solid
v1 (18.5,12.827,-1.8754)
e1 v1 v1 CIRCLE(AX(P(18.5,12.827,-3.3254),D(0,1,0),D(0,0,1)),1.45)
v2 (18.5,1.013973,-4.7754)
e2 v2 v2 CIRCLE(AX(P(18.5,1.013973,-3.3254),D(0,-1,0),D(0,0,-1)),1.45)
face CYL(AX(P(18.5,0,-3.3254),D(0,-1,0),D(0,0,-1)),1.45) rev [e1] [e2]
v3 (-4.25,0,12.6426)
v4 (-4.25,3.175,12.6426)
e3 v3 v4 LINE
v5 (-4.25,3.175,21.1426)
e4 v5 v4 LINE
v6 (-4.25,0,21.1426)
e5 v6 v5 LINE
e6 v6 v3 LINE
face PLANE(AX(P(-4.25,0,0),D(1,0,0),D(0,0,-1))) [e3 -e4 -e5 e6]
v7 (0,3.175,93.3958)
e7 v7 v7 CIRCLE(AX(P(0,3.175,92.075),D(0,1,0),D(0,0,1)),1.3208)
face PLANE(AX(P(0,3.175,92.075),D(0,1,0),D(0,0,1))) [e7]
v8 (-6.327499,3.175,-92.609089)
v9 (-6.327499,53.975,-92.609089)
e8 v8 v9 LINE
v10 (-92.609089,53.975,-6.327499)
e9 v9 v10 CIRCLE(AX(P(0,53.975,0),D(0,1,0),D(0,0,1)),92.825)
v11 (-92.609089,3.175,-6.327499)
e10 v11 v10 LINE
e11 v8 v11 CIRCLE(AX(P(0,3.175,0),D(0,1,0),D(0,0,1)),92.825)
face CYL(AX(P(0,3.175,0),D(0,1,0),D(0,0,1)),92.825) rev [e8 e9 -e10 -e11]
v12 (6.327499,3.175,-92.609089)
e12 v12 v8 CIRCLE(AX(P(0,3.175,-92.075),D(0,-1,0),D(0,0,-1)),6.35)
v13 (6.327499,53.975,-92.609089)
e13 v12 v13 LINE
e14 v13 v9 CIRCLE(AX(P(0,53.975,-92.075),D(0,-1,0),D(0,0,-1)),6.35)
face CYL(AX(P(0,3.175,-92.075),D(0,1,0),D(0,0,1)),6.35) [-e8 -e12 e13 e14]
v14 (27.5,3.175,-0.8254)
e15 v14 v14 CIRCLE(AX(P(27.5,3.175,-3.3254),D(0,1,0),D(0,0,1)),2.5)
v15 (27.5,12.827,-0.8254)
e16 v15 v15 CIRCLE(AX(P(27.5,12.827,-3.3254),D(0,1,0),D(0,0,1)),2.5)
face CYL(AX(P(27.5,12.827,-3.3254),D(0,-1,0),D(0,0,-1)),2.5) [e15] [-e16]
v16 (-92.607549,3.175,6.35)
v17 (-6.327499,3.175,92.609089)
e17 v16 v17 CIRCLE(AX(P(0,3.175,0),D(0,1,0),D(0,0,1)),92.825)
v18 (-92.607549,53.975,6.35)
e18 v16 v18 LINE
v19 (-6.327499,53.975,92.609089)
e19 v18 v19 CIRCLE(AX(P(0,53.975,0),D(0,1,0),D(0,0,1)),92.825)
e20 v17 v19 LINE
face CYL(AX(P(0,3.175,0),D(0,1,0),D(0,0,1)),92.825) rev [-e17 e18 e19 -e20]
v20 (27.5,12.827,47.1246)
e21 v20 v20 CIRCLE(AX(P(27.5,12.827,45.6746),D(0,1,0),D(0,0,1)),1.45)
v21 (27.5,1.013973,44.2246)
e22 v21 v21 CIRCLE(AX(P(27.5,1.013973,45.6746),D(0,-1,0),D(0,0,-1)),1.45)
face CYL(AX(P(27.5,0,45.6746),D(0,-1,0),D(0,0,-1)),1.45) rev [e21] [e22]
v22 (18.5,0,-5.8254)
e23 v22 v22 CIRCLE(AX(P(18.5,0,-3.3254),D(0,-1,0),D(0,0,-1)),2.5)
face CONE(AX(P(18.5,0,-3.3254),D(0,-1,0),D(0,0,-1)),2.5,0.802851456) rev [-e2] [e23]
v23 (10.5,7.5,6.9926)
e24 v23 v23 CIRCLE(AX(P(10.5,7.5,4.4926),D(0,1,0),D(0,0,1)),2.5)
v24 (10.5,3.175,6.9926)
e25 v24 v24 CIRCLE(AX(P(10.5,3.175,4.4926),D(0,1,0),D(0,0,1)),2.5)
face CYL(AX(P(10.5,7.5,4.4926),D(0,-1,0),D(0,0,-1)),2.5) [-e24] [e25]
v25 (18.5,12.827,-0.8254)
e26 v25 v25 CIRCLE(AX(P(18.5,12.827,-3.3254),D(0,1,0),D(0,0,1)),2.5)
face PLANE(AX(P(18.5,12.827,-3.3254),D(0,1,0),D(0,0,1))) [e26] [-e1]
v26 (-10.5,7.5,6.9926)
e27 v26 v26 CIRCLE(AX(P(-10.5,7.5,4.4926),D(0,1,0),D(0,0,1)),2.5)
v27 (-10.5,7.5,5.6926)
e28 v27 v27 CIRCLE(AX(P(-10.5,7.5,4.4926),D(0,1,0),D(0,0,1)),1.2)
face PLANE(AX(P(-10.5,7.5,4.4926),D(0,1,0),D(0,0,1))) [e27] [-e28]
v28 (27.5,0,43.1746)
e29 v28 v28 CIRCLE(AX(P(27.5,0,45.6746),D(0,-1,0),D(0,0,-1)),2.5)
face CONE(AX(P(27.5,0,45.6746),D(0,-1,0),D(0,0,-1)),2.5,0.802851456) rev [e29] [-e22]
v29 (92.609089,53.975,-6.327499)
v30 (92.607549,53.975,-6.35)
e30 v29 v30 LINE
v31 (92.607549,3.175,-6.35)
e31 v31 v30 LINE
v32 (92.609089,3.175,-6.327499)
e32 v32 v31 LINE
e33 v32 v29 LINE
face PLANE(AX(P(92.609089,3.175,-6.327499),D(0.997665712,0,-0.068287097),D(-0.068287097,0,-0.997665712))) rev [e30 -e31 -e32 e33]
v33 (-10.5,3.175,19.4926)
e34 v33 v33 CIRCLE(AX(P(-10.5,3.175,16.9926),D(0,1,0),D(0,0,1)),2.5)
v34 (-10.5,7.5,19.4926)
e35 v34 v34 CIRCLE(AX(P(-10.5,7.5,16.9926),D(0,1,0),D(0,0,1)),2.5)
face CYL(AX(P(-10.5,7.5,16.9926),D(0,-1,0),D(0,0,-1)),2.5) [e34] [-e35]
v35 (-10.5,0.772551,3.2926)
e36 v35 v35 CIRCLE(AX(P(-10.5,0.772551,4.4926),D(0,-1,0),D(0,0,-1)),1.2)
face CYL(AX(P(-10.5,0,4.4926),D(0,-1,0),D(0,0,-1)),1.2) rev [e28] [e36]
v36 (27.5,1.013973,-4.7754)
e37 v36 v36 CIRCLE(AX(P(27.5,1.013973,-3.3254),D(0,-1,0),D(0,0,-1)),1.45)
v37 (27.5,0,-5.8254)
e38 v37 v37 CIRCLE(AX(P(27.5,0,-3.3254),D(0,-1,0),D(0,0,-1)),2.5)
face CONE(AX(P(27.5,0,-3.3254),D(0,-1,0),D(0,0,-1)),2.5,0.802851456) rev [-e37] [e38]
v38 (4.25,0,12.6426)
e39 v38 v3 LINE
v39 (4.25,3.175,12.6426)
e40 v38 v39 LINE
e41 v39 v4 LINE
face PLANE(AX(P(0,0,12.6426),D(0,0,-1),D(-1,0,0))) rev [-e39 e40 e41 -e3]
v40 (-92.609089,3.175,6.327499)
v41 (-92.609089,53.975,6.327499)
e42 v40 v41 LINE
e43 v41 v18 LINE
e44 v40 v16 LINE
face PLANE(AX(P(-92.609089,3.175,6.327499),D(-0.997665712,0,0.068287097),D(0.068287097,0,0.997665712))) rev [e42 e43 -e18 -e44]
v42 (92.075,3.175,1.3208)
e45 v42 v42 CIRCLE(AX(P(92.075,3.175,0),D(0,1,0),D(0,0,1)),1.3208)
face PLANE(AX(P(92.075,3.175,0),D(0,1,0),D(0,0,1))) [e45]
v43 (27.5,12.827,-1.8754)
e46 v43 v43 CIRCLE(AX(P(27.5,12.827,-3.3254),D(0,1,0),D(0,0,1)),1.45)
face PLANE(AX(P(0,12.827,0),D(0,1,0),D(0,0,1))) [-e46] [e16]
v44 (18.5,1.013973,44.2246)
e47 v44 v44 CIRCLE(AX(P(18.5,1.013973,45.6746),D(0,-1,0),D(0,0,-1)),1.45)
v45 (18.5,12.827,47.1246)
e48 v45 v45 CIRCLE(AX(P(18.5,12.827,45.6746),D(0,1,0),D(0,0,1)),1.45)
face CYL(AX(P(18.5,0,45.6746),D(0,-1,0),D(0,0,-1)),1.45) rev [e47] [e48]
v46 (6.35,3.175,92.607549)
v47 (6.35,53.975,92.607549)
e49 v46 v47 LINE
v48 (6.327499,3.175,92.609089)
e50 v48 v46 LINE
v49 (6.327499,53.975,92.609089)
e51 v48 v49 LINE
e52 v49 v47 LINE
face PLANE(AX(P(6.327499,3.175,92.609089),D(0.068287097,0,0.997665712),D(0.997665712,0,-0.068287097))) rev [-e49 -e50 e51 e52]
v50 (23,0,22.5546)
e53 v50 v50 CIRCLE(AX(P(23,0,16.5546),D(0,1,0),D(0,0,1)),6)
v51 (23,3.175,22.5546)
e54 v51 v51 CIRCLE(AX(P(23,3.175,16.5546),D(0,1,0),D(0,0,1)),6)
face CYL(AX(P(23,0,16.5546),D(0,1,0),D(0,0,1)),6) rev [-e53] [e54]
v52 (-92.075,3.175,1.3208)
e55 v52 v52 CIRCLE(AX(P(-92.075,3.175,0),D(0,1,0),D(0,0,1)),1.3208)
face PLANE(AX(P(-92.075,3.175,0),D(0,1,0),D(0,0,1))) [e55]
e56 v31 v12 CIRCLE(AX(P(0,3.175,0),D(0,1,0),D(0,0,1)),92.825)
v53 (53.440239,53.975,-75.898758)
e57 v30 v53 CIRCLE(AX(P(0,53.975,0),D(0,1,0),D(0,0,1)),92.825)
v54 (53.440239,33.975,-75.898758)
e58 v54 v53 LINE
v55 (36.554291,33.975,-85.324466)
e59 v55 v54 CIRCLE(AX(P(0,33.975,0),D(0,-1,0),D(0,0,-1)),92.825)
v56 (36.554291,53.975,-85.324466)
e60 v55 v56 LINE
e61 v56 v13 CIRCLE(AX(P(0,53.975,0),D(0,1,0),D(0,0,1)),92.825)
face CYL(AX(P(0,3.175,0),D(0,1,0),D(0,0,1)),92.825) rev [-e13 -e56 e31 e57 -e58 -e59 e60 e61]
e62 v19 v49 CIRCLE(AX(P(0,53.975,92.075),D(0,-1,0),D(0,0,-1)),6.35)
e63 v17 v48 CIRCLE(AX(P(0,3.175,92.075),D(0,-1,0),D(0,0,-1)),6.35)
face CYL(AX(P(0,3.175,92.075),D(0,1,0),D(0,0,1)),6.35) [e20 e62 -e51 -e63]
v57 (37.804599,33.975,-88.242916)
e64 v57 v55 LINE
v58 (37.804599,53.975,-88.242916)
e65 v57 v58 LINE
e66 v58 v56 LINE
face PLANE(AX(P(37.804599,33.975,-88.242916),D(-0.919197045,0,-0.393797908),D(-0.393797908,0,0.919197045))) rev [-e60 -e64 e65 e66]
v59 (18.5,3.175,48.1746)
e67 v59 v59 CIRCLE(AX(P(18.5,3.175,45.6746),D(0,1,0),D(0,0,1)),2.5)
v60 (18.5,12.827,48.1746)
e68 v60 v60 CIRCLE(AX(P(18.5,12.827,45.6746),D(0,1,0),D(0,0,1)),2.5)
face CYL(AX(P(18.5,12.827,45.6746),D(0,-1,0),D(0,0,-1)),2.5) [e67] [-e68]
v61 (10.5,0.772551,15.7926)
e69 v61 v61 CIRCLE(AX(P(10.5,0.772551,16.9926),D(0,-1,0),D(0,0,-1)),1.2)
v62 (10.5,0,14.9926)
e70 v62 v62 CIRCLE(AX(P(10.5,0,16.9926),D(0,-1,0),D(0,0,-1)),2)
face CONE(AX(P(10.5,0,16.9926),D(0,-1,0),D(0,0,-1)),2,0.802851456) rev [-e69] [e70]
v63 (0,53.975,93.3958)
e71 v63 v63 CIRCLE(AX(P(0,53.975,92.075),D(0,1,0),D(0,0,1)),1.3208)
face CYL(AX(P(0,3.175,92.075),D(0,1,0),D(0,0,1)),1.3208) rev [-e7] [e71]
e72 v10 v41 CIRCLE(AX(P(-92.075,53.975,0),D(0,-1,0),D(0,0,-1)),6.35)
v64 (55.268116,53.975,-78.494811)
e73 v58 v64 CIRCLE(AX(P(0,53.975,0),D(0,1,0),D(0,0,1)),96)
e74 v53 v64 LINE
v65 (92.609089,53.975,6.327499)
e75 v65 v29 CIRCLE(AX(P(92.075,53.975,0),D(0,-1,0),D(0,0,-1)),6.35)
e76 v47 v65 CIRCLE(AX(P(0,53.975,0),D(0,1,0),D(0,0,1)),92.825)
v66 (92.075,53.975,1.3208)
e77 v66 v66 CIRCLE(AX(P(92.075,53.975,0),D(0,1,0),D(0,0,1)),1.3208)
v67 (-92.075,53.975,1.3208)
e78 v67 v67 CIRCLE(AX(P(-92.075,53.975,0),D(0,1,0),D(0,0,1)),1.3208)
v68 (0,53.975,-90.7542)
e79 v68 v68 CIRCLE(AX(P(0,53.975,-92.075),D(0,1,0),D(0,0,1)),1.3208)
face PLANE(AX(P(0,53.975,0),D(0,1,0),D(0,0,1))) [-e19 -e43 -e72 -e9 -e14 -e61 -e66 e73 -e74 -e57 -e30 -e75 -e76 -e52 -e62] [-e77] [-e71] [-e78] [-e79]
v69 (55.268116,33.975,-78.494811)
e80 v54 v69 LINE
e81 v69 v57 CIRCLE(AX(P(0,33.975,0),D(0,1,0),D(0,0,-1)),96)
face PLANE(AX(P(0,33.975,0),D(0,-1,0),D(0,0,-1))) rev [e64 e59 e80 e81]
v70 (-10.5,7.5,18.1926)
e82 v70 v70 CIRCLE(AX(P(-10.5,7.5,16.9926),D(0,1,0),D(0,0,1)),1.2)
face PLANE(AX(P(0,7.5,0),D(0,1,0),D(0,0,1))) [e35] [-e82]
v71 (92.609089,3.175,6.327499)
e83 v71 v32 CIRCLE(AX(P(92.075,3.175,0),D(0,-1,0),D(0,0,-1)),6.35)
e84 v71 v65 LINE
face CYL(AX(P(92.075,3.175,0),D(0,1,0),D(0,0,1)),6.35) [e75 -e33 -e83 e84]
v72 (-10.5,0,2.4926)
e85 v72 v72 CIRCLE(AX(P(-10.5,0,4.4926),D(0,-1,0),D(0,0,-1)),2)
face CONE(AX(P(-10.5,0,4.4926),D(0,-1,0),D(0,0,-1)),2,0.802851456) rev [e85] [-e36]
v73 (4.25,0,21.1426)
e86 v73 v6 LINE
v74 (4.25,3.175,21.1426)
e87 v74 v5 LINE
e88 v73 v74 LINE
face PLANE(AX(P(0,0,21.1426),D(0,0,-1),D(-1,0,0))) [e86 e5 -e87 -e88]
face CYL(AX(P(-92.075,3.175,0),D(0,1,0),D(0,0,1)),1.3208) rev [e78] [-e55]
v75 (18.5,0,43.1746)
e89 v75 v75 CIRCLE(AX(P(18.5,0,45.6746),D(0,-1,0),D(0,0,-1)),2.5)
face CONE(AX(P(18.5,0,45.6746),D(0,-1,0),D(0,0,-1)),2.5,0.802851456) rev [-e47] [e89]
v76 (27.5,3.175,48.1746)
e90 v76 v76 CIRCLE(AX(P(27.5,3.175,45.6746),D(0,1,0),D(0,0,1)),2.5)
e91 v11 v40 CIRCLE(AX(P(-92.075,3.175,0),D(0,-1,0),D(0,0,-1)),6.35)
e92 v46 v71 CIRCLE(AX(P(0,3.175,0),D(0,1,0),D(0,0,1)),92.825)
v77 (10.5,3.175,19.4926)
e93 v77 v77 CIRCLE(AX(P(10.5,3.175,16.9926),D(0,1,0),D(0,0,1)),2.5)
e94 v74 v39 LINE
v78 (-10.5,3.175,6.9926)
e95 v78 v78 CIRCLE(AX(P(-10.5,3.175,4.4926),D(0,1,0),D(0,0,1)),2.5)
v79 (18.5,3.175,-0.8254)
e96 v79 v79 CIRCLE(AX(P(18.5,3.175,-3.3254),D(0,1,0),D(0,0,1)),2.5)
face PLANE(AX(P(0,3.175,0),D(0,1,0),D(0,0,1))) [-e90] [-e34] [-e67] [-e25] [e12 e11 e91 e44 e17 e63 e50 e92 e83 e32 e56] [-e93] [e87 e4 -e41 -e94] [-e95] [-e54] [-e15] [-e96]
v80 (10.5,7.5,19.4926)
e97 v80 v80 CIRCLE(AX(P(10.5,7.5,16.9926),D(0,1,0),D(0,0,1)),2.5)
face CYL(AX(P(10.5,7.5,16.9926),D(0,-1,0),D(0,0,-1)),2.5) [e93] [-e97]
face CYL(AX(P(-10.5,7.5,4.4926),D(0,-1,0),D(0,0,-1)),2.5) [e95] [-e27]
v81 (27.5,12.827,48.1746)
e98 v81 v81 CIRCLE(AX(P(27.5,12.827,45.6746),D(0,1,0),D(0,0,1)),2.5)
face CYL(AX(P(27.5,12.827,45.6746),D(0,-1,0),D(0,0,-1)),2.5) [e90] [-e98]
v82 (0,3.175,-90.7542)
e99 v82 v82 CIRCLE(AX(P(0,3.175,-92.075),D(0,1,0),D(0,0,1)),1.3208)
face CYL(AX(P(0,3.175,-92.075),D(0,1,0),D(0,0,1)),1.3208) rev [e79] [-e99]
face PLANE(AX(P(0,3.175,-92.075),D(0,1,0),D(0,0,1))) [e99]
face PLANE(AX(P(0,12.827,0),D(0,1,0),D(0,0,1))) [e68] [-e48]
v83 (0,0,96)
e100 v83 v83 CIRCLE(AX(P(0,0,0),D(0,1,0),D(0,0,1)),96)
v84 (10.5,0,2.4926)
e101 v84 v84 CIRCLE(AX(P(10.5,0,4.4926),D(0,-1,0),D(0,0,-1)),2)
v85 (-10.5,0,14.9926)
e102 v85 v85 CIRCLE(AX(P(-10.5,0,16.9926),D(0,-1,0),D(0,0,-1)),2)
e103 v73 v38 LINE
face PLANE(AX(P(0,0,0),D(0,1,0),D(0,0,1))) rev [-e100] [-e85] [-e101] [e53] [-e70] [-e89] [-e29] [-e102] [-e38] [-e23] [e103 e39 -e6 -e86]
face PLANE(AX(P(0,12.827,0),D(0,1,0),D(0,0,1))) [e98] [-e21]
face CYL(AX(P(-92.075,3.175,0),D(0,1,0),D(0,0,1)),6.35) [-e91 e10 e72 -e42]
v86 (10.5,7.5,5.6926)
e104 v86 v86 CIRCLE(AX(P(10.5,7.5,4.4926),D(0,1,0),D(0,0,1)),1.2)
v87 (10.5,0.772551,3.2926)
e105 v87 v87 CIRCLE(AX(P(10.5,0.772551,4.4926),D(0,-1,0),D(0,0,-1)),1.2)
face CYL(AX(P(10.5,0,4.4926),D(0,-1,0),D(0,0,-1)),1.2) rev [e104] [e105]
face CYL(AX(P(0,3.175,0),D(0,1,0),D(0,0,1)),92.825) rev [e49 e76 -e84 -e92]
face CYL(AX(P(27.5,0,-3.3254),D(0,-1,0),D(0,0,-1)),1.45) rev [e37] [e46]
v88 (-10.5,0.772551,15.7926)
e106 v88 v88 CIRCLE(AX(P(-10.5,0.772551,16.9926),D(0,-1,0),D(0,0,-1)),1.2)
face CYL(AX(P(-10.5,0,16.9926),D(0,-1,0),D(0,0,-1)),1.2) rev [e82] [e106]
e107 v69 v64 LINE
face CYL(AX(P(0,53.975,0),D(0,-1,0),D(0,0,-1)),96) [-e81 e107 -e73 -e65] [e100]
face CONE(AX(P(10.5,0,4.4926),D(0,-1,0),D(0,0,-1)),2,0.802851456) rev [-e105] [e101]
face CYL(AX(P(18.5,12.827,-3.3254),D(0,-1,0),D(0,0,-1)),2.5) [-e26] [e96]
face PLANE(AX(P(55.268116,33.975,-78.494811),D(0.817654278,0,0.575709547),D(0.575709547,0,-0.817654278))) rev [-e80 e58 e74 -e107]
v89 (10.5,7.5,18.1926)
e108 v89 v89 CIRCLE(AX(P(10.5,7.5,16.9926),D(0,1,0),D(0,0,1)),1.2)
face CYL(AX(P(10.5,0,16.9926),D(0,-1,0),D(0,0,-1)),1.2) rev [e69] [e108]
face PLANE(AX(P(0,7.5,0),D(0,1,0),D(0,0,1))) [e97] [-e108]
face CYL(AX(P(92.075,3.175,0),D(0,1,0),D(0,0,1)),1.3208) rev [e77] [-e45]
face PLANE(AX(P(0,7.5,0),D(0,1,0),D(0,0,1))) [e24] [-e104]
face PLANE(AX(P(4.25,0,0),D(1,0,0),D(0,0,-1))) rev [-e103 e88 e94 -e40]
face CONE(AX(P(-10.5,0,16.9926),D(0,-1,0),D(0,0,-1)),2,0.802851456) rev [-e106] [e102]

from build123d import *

# Parameters (mm, degrees)
SKETCH1_R                                            = 96
BOSS_EXTRUDE1_DEPTH                                  = 53.975
SKETCH2_R                                            = 1.3208
CUT_EXTRUDE1_DEPTH                                   = 50.8
SKETCH3_R                                            = 6
SKETCH3_W                                            = 8.5
SKETCH3_H                                            = 8.5
CUT_EXTRUDE2_DEPTH                                   = 145.957373045
BOSS_EXTRUDE2_START                                  = 3.175
BOSS_EXTRUDE2_OUTLINE_R                              = 2.5
BOSS_EXTRUDE2_DEPTH                                  = 4.325
BOSS_EXTRUDE3_START                                  = 3.175
BOSS_EXTRUDE3_OUTLINE_R                              = 2.5
BOSS_EXTRUDE3_DEPTH                                  = 9.652
CSK_FOR_M2_5_CROSS_COUNTERSUNK_HEAD_SCRE_D           = 2.9
CSK_FOR_M2_5_CROSS_COUNTERSUNK_HEAD_SCRE_CSINK_D     = 5
CSK_FOR_M2_5_CROSS_COUNTERSUNK_HEAD_SCRE_CSINK_ANGLE = 92
CSK_FOR_M2_CROSS_COUNTERSUNK_HEAD_SCREW1_D           = 2.4
CSK_FOR_M2_CROSS_COUNTERSUNK_HEAD_SCREW1_CSINK_D     = 4
CSK_FOR_M2_CROSS_COUNTERSUNK_HEAD_SCREW1_CSINK_ANGLE = 92
CUT_EXTRUDE4_DEPTH                                   = 20


# Read off the part's stored shape, not the designer's step: Boss-Extrude2, Boss-Extrude3
with BuildPart() as part:
    # Sketch1 → Boss-Extrude1 (new body)
    with BuildSketch(Plane(origin=(0, 0, 0), x_dir=(1, 0, 0), z_dir=(0, 1, 0))):
        with Locations(Location((0, 0, 0), (0, 0, 270))):
            Circle(SKETCH1_R)
    extrude(amount=BOSS_EXTRUDE1_DEPTH)

    # Sketch2 → Cut-Extrude1 (cut)
    with BuildSketch(Plane(origin=(0, 53.975, 0), x_dir=(1, 0, 0), z_dir=(0, 1, 0))):
        with Locations(Location((0, 92.075, 0), (0, 0, 270))):
            Circle(SKETCH2_R)
        with Locations(Location((92.075, 0, 0), (0, 0, 270))):
            Circle(SKETCH2_R)
        with Locations(Location((0, -92.075, 0), (0, 0, 270))):
            Circle(SKETCH2_R)
        with Locations(Location((-92.075, 0, 0), (0, 0, 270))):
            Circle(SKETCH2_R)
        with BuildLine():
            Line((92.609089058, 6.327499417), (92.607548963, 6.35))
            ThreePointArc((92.607548963, 6.35), (65.629212709, 65.64516025), (6.327499417, 92.609089058))
            ThreePointArc((6.327499417, 92.609089058), (0, 85.725), (-6.327499417, 92.609089058))
            ThreePointArc((-6.327499417, 92.609089058), (-65.637186964, 65.637186964), (-92.609089058, 6.327499417))
            ThreePointArc((-92.609089058, 6.327499417), (-85.725, 0), (-92.609089058, -6.327499417))
            Line((-92.609089058, -6.327499417), (-92.607548963, -6.35))
            ThreePointArc((-92.607548963, -6.35), (-65.629212709, -65.64516025), (-6.327499417, -92.609089058))
            ThreePointArc((-6.327499417, -92.609089058), (0, -85.725), (6.327499417, -92.609089058))
            Line((6.327499417, -92.609089058), (6.35, -92.607548963))
            ThreePointArc((6.35, -92.607548963), (65.64516025, -65.629212709), (92.609089058, -6.327499417))
            ThreePointArc((92.609089058, -6.327499417), (85.725, 0), (92.609089058, 6.327499417))
        make_face()
    extrude(amount=-CUT_EXTRUDE1_DEPTH, mode=Mode.SUBTRACT)

    # Sketch3 → Cut-Extrude2 (cut, through all)
    with BuildSketch(Plane(origin=(0, 3.175, 0), x_dir=(1, 0, 0), z_dir=(0, 1, 0))):
        with Locations(Location((23, -16.5546, 0), (0, 0, 270))):
            Circle(SKETCH3_R)
        with Locations((0, -16.8926)):
            Rectangle(SKETCH3_W, SKETCH3_H)
    extrude(amount=-CUT_EXTRUDE2_DEPTH, mode=Mode.SUBTRACT)

    # Boss-Extrude2 outline → Boss-Extrude2 (add)
    with BuildSketch(Plane(origin=(0, 0, 0), x_dir=(1, 0, 0), z_dir=(0, 1, 0)).offset(BOSS_EXTRUDE2_START)):
        with Locations((10.5, -4.4926)):
            Circle(BOSS_EXTRUDE2_OUTLINE_R)
        with Locations((10.5, -16.9926)):
            Circle(BOSS_EXTRUDE2_OUTLINE_R)
        with Locations((-10.5, -16.9926)):
            Circle(BOSS_EXTRUDE2_OUTLINE_R)
        with Locations((-10.5, -4.4926)):
            Circle(BOSS_EXTRUDE2_OUTLINE_R)
    extrude(amount=BOSS_EXTRUDE2_DEPTH)

    # Boss-Extrude3 outline → Boss-Extrude3 (add)
    with BuildSketch(Plane(origin=(0, 0, 0), x_dir=(1, 0, 0), z_dir=(0, 1, 0)).offset(BOSS_EXTRUDE3_START)):
        with Locations((27.5, 3.3254)):
            Circle(BOSS_EXTRUDE3_OUTLINE_R)
        with Locations((18.5, -45.6746)):
            Circle(BOSS_EXTRUDE3_OUTLINE_R)
        with Locations((27.5, -45.6746)):
            Circle(BOSS_EXTRUDE3_OUTLINE_R)
        with Locations((18.5, 3.3254)):
            Circle(BOSS_EXTRUDE3_OUTLINE_R)
    extrude(amount=BOSS_EXTRUDE3_DEPTH)

    # CSK for M2.5 Cross Countersunk Head Screw1 (through all)
    with Locations(Plane(origin=(0, 0, 0), x_dir=(-1, 0, 0), z_dir=(0, -1, 0))):
        with Locations((-27.5, 3.3254), (-18.5, 3.3254), (-27.5, -45.6746), (-18.5, -45.6746)):
            CounterSinkHole(CSK_FOR_M2_5_CROSS_COUNTERSUNK_HEAD_SCRE_D / 2, CSK_FOR_M2_5_CROSS_COUNTERSUNK_HEAD_SCRE_CSINK_D / 2, counter_sink_angle=CSK_FOR_M2_5_CROSS_COUNTERSUNK_HEAD_SCRE_CSINK_ANGLE)

    # CSK for M2 Cross Countersunk Head Screw1 (through all)
    with Locations(Plane(origin=(0, 0, 0), x_dir=(-1, 0, 0), z_dir=(0, -1, 0))):
        with Locations((10.5, -4.4926), (-10.5, -4.4926), (-10.5, -16.9926), (10.5, -16.9926)):
            CounterSinkHole(CSK_FOR_M2_CROSS_COUNTERSUNK_HEAD_SCREW1_D / 2, CSK_FOR_M2_CROSS_COUNTERSUNK_HEAD_SCREW1_CSINK_D / 2, counter_sink_angle=CSK_FOR_M2_CROSS_COUNTERSUNK_HEAD_SCREW1_CSINK_ANGLE)

    # Sketch10 → Cut-Extrude4 (cut)
    with BuildSketch(Plane(origin=(0, 53.975, 0), x_dir=(1, 0, 0), z_dir=(0, 1, 0))):
        with BuildLine():
            Line((37.80459918, 88.242916321), (36.554290822, 85.324465703))
            ThreePointArc((36.554290822, 85.324465703), (45.243395364, 81.052549626), (53.440238661, 75.898758335))
            Line((53.440238661, 75.898758335), (55.268116471, 78.494810667))
            ThreePointArc((55.268116471, 78.494810667), (46.790907136, 83.824882996), (37.80459918, 88.242916321))
        make_face()
    extrude(amount=-CUT_EXTRUDE4_DEPTH, mode=Mode.SUBTRACT)


solid = part.part
